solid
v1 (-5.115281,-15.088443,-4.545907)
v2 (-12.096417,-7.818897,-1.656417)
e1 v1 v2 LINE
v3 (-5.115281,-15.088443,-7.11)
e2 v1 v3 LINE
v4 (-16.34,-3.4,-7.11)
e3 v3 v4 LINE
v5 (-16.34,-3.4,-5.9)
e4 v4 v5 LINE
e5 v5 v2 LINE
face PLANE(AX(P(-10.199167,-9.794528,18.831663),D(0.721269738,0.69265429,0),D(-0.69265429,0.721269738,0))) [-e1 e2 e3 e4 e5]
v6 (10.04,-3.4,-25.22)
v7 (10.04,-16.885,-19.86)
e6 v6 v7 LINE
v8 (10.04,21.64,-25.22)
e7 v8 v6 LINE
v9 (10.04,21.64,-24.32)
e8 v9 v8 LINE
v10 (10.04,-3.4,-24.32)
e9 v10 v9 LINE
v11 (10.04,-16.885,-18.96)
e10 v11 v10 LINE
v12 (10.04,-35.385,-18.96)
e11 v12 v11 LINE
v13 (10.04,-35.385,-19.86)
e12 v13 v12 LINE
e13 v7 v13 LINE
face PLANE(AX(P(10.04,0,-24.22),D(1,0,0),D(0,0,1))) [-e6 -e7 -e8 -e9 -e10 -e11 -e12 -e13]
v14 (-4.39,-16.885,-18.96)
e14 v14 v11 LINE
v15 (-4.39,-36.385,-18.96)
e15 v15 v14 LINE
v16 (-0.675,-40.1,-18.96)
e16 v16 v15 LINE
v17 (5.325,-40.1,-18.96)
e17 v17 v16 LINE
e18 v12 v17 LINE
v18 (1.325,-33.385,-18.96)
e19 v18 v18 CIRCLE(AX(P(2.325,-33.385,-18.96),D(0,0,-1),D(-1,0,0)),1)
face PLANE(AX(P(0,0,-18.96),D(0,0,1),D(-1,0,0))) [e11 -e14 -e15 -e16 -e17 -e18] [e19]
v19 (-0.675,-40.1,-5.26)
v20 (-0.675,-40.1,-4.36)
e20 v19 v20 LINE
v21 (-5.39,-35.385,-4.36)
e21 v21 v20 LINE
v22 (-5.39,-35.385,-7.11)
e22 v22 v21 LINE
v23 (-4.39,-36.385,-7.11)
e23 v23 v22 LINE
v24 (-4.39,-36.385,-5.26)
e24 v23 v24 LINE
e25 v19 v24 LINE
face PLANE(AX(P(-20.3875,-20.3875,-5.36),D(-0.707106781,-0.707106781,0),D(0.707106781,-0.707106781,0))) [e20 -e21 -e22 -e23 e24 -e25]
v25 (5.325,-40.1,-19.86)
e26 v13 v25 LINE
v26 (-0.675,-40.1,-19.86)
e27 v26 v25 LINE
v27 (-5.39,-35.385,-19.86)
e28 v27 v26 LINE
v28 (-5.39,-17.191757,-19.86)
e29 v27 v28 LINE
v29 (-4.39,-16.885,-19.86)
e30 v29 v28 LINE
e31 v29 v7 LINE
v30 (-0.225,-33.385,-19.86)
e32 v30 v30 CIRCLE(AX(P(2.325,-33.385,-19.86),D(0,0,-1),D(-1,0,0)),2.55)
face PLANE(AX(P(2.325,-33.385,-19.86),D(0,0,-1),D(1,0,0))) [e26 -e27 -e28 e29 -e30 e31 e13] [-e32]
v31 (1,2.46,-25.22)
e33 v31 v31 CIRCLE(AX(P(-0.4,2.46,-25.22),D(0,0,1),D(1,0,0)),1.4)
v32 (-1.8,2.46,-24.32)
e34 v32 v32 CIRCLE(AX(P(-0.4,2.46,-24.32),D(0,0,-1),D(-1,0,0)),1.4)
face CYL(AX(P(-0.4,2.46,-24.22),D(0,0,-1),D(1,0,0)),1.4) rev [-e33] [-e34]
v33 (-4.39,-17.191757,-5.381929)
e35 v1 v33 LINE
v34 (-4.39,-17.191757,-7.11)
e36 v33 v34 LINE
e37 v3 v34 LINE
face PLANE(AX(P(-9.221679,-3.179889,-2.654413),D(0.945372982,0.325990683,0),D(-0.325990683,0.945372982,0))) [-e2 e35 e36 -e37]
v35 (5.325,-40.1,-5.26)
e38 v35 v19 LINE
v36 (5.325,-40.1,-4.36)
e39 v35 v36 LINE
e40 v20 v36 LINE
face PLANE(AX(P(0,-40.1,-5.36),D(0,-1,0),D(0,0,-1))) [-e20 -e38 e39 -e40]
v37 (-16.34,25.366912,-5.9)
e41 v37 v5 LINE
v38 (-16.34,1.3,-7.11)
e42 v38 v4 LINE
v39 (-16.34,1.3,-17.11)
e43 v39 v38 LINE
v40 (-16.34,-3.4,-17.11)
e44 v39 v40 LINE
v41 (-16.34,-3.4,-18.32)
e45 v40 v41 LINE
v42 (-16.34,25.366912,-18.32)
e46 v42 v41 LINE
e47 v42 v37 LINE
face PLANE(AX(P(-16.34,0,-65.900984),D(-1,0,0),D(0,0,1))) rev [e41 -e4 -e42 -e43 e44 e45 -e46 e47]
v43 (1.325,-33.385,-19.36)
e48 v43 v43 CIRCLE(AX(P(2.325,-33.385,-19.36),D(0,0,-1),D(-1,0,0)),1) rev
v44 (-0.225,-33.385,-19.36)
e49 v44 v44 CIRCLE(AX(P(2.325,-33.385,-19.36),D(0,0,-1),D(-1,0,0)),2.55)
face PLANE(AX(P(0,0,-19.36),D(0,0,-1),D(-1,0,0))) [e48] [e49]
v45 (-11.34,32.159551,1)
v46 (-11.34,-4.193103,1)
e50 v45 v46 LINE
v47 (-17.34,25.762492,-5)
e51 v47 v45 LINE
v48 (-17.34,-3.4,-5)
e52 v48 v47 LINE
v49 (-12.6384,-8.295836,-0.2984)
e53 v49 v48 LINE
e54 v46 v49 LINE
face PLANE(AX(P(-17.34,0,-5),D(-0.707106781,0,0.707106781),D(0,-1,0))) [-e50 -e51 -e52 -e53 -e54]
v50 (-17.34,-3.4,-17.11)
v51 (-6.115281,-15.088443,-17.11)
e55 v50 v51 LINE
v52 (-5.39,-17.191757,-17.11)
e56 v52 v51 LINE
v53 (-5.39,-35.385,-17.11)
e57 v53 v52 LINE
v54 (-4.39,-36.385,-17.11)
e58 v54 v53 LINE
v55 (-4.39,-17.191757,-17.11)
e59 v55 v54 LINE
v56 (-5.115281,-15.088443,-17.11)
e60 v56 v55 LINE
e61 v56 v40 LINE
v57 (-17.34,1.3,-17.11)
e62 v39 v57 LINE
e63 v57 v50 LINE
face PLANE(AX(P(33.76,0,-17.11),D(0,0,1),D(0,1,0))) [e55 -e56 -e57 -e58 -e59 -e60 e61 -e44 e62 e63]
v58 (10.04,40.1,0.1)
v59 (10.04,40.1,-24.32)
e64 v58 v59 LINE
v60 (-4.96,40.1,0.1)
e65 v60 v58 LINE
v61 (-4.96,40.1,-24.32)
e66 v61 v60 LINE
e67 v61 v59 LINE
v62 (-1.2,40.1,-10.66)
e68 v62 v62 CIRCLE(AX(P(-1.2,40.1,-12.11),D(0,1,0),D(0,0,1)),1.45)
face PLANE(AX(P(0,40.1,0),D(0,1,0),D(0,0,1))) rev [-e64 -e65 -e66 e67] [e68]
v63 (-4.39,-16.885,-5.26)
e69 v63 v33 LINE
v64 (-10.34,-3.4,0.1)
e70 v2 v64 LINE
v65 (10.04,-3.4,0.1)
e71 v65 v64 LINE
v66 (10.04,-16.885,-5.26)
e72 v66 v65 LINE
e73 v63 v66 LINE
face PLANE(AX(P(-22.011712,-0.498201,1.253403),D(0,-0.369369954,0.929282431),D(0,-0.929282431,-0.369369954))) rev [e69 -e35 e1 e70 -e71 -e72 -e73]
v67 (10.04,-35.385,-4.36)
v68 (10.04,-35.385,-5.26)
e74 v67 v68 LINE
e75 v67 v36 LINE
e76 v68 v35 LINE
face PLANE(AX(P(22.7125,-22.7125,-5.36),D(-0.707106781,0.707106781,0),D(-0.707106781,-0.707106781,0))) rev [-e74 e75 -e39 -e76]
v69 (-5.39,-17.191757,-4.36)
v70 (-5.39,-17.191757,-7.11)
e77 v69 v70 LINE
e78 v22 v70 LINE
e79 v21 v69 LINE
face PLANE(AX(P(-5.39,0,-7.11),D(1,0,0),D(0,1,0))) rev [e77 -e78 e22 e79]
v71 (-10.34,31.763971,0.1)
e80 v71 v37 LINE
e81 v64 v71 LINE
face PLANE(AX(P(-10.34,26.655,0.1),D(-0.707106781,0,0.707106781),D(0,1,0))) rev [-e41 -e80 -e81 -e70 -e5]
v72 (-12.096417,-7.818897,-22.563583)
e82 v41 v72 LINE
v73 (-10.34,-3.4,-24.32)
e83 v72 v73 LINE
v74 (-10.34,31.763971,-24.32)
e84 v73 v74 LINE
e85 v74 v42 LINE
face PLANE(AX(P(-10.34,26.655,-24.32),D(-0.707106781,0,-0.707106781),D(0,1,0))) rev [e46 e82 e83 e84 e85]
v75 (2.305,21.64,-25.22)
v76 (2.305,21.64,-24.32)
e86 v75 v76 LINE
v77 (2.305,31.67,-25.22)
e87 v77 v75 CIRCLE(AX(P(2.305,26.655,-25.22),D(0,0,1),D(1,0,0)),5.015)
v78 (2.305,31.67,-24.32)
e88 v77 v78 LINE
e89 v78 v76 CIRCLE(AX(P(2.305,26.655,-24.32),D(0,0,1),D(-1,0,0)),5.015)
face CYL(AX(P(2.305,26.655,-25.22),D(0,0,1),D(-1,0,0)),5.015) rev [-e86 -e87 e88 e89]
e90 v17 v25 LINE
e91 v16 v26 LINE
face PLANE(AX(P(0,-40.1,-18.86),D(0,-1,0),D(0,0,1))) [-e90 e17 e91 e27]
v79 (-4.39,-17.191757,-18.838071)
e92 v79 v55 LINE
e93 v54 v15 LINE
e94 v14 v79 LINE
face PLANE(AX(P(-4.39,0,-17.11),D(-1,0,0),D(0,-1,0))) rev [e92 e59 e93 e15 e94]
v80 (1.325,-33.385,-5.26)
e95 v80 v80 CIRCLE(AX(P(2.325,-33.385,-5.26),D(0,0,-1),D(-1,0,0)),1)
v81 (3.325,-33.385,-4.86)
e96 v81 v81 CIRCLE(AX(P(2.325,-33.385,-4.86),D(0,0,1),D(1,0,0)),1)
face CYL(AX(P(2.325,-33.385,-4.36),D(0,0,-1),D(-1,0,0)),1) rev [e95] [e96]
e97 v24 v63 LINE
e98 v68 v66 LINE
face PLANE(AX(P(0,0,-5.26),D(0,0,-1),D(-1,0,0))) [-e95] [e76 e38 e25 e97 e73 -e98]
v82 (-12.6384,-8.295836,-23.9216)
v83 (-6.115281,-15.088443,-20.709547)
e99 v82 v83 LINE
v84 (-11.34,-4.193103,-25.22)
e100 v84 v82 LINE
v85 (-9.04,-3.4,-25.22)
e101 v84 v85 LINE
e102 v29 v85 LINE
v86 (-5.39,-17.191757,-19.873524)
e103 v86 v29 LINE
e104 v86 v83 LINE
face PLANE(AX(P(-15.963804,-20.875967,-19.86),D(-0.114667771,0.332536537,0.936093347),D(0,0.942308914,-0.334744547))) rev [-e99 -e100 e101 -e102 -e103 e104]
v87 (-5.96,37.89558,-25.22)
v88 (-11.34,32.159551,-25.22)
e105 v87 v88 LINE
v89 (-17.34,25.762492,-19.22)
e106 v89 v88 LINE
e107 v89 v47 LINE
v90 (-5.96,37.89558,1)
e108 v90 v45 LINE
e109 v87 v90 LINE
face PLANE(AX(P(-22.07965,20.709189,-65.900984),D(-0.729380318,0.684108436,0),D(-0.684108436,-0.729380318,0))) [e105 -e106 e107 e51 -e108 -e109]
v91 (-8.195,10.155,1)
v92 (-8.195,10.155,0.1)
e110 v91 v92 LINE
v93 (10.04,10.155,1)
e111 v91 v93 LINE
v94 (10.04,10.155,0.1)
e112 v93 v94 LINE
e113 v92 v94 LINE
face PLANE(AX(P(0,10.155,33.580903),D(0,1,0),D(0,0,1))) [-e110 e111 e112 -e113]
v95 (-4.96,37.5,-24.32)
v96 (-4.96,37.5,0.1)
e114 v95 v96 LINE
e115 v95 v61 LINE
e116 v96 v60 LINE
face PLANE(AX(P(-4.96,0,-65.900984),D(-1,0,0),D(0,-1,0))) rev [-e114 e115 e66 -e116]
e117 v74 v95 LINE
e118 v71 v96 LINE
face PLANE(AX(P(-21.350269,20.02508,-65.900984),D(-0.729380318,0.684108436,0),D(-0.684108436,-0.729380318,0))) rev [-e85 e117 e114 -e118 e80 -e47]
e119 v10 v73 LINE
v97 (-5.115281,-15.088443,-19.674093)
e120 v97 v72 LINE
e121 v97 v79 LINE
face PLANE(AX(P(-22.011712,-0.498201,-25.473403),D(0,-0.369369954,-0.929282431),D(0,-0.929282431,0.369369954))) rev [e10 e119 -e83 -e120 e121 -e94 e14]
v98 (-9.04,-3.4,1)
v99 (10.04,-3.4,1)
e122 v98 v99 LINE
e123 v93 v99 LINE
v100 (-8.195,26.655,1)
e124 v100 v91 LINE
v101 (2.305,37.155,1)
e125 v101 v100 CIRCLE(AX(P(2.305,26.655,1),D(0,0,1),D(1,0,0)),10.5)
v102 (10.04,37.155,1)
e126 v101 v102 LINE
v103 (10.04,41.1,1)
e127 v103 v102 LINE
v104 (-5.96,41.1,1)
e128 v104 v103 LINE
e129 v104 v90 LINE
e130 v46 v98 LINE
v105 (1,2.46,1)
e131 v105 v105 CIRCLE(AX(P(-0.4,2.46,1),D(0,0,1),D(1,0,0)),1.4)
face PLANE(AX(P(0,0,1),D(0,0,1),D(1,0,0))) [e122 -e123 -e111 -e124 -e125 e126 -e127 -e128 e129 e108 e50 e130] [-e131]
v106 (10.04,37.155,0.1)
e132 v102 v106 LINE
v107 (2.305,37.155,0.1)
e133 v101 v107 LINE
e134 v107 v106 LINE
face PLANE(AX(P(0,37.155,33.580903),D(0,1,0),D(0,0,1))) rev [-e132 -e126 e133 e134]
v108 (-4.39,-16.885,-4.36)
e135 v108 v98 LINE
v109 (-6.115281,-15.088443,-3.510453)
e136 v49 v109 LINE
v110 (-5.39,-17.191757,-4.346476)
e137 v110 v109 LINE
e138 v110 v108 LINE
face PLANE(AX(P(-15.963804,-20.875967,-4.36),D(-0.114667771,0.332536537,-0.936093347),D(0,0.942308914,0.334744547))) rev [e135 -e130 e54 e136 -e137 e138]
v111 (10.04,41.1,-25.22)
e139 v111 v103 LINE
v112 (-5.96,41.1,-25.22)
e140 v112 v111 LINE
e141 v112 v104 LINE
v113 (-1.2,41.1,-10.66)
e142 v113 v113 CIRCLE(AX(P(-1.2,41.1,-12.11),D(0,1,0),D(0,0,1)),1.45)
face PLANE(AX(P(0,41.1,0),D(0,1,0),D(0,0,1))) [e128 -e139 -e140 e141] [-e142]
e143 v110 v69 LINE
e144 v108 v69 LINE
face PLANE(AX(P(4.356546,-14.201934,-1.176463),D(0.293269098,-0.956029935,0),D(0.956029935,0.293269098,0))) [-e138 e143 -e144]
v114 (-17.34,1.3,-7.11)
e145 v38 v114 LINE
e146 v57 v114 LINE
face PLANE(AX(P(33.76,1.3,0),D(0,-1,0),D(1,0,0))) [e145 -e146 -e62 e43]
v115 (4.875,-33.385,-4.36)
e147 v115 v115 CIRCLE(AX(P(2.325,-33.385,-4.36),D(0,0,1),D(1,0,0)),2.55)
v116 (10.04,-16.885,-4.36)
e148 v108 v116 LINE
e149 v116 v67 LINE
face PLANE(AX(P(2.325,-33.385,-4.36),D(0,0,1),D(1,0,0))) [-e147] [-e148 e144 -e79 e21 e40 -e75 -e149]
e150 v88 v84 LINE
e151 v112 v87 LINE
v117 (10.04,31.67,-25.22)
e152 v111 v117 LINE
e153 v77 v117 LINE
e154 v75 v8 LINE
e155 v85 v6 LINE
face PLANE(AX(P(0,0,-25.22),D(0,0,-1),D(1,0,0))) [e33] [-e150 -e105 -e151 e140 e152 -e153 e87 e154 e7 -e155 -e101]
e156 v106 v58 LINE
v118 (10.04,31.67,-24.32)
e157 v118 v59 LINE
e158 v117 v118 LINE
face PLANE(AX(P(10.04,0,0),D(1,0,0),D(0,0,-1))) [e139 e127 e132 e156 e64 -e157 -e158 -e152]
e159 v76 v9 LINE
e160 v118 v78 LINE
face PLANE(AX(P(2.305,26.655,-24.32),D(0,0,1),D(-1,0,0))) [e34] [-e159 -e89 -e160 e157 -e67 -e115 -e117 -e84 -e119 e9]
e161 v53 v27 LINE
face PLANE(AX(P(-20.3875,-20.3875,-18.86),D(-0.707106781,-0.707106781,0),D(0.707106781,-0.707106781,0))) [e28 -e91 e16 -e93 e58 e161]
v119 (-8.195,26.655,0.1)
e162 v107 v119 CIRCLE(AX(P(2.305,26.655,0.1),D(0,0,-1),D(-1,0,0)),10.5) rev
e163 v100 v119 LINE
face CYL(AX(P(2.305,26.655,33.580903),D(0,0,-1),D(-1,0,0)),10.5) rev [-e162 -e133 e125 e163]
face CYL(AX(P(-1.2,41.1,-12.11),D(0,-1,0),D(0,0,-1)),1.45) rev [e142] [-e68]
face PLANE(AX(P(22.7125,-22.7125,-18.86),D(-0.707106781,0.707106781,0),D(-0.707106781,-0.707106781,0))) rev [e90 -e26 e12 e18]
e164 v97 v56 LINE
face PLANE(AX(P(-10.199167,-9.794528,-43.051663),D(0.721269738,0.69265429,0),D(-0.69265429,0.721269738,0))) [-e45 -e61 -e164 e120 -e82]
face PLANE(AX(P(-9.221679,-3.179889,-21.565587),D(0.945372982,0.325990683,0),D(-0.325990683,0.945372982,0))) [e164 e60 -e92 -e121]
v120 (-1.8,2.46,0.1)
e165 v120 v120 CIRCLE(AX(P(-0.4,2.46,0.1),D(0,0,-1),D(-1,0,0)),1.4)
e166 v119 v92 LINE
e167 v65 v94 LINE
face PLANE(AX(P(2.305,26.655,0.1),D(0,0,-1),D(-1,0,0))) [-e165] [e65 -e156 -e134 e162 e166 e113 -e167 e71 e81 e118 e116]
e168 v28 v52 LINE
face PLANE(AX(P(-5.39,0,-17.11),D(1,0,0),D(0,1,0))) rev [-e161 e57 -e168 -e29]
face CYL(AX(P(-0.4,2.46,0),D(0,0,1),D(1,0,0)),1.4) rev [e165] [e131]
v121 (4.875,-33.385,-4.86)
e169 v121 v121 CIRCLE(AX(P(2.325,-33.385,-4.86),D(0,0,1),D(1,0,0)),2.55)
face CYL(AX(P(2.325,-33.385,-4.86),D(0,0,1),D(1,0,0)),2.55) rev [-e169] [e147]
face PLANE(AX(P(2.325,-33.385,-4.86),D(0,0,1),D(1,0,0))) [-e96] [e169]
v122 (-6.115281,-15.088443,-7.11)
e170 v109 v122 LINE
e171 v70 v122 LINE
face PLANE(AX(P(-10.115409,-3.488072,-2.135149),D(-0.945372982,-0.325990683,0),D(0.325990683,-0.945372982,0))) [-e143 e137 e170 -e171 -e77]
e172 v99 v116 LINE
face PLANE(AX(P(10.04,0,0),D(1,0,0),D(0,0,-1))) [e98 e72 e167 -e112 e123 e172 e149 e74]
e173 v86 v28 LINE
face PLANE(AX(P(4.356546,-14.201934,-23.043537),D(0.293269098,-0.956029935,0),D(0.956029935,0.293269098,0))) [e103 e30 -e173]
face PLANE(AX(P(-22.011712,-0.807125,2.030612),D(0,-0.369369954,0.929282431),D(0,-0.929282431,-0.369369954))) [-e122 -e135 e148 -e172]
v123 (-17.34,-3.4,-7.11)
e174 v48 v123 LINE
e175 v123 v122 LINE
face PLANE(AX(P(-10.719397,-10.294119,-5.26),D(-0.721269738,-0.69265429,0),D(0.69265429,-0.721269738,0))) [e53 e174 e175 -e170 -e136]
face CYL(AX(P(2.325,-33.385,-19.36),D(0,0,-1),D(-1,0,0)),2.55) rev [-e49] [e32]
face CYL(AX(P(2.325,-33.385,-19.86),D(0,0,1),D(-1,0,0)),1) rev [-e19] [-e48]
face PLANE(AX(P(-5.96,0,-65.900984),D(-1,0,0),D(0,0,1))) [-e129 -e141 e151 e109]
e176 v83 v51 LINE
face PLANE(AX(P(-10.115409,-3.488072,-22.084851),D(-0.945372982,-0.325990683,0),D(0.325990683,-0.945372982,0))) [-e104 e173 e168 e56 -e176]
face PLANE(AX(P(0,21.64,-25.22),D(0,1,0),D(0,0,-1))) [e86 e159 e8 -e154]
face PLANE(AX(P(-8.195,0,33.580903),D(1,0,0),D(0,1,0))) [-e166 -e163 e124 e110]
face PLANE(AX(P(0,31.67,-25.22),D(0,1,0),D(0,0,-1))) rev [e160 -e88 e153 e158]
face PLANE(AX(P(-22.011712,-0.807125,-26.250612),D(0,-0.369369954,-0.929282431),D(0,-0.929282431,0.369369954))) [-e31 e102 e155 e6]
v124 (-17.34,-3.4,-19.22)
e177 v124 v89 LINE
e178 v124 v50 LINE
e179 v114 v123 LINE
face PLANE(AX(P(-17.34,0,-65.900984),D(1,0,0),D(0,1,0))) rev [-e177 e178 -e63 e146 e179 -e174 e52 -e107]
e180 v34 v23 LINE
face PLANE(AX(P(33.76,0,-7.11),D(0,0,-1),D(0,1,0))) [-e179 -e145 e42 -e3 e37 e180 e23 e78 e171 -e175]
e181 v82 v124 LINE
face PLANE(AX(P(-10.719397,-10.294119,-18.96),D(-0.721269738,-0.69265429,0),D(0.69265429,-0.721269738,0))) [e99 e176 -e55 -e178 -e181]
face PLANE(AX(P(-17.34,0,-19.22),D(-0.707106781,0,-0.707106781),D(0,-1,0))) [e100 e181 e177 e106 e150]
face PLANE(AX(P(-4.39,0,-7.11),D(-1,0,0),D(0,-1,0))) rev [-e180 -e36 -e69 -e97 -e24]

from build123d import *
from build123d.topology import SkipClean

# Parameters (mm, degrees)
EXTRUDE_1_DEPTH      = 1
SKETCH_2_W           = 14.000000000000007
SKETCH_2_H           = 24.219999999999995
SKETCH_2_R           = 1.45
SKETCH_2_H_2         = 1
EXTRUDE_2_DEPTH      = 1
SKETCH_3_R           = 1.4
CUT_EXTRUDE_1_DEPTH  = 50.06098246060713
EXTRUDE_3_DEPTH      = 25.22
EXTRUDE_4_DEPTH      = 1
CUT_EXTRUDE_2_DEPTH  = 0.1
EXTRUDE_5_REACH      = 56.514
EXTRUDE_6_DEPTH      = 4.7
EXTRUDE_7_DEPTH      = 6.26
CUT_EXTRUDE_3_DEPTH  = 54.61414092494707
CUT_EXTRUDE_4_REACH  = 50.47
EXTRUDE_8_REACH      = 53.244
CUT_EXTRUDE_6_DEPTH  = 0.721269738
SKETCH_15_R          = 1.000000000000005
EXTRUDE_9_DEPTH      = 1
EXTRUDE_START        = -1
EXTRUDE_10_DEPTH     = 1
CUT_EXTRUDE_7_DEPTH  = 0.1
CUT_EXTRUDE_10_REACH = 56.514
CUT_EXTRUDE_12_DEPTH = 51.10000000000001
EXTRUDE_START_2      = -2.75
EXTRUDE_11_DEPTH     = 2.75
CUT_EXTRUDE_13_REACH = 49.777
CUT_EXTRUDE_14_REACH = 49.777
EXTRUDE_12_DEPTH     = 2.75
EXTRUDE_13_REACH     = 50.829
CUT_EXTRUDE_15_REACH = 49.777
EXTRUDE_START_3      = -2.81831
EXTRUDE_14_DEPTH     = 2.81831
CUT_EXTRUDE_START    = -0.75
CUT_EXTRUDE_16_DEPTH = 0.75
CHAMFER_1_SIZE       = 0.8
CHAMFER_3_SIZE       = 6
EXTRUDE_15_DEPTH     = 1
EXTRUDE_16_DEPTH     = 1
CUT_EXTRUDE_17_DEPTH = 1
SKETCH_36_R          = 1.4000000000000001
CUT_EXTRUDE_18_DEPTH = 1
EXTRUDE_17_DEPTH     = 0.9
CUT_EXTRUDE_START_2  = -12.11
SKETCH_40_W          = 89.84282301383726
SKETCH_40_H          = 107.72029223205328
CUT_EXTRUDE_20_DEPTH = 12.11
CUT_EXTRUDE_22_DEPTH = 13.11
SKETCH_42_R          = 2.549999999999999
SKETCH_42_R_2        = 1.000000000000005
CUT_EXTRUDE_23_DEPTH = 0.5
CUT_EXTRUDE_START_3  = -0.5
SKETCH_43_R          = 2.549999999999998
CUT_EXTRUDE_24_DEPTH = 0.5


with BuildPart() as part:
    # 草图1 → 凸台-拉伸1 (new body)
    with BuildSketch(Plane.XY):
        with BuildLine():
            ThreePointArc((2.305000000000004, 21.64000000000001), (-2.7099999999999955, 26.655000000000012), (2.3050000000000055, 31.670000000000012))
            Line((2.305000000000005, 31.670000000000012), (9.040000000000003, 31.670000000000012))
            Line((9.040000000000003, 31.670000000000012), (9.040000000000003, 40.10000000000001))
            Line((9.040000000000003, 40.10000000000001), (-4.960000000000004, 40.10000000000001))
            Line((-4.960000000000004, 40.10000000000001), (-4.960000000000003, 37.50000000000002))
            Line((-4.960000000000003, 37.50000000000002), (-9.039999999999996, 33.15000000000001))
            Line((-9.039999999999996, 33.15000000000001), (-9.04, -3.3999999999999915))
            Line((-9.04, -3.3999999999999932), (9.040000000000003, -3.3999999999999932))
            Line((9.040000000000003, -3.3999999999999932), (9.040000000000003, 6.670384958363659))
            Line((9.040000000000003, 6.670384958363659), (9.040000000000003, 21.640000000000015))
            Line((9.040000000000003, 21.640000000000015), (2.305000000000005, 21.640000000000015))
        make_face()
    extrude(amount=EXTRUDE_1_DEPTH)

    # 草图2 → 凸台-拉伸2 (add)
    # profile 1 of 2: a face of its own
    with BuildSketch(Plane(origin=(0, 40.10000000000001, 0), x_dir=(1, 0, 0), z_dir=(0, 1, 0))):
        with Locations((2.039999999999999, 12.109999999999998)):
            Rectangle(SKETCH_2_W, SKETCH_2_H)
        with Locations(Location((-1.1999999999999935, 12.11, 0), (0, 0, 270))):
            Circle(SKETCH_2_R, mode=Mode.SUBTRACT)
    # profile 2 of 2: a face of its own
    with BuildSketch(Plane(origin=(0, 40.10000000000001, 0), x_dir=(1, 0, 0), z_dir=(0, 1, 0))):
        with Locations((2.039999999999999, -0.5)):
            Rectangle(SKETCH_2_W, SKETCH_2_H_2)
    extrude(amount=EXTRUDE_2_DEPTH)

    # 草图3 → 切除-拉伸1 (cut, through all)
    with BuildSketch(Plane.XY.offset(1)):
        with Locations((0.9999999999999981, 2.460000000000012)):
            Circle(SKETCH_3_R)
    extrude(amount=-CUT_EXTRUDE_1_DEPTH, mode=Mode.SUBTRACT)

    # 草图4 → 凸台-拉伸3 (add)
    with BuildSketch(Plane.XY.offset(1)):
        Polygon((-15.939999999999996, 25.793382352941165), (-15.939999999999996, 27.255138921743242), (-17.339999999999993, 25.762491862919703), (-17.339999999999996, 24.30073529411763), (-16.33999999999999, 25.366911764705875), align=None)
        Polygon((-16.33999999999999, 25.366911764705875), (-17.339999999999996, 24.30073529411763), (-17.339999999999996, 24.20000000000001), (-17.339999999999993, 1.3000000000000078), (-16.339999999999996, 1.3000000000000096), (-16.339999999999996, 24.20000000000001), align=None)
        Polygon((-4.960000000000004, 41.10000000000001), (-5.960000000000004, 41.10000000000001), (-5.960000000000004, 37.89558009821385), (-9.769380317724162, 33.834108435934404), (-15.93999999999999, 27.25513892174324), (-15.939999999999996, 25.793382352941165), (-9.039999999999996, 33.15000000000001), (-4.960000000000003, 37.50000000000002), align=None)
    extrude(amount=-EXTRUDE_3_DEPTH)

    # 草图5 → 凸台-拉伸4 (add)
    with BuildSketch(Plane.XY.offset(1)):
        Polygon((-16.339999999999993, 25.36691176470587), (-16.339999999999996, 1.3000000000000096), (-9.039999999999997, 1.3000000000000165), (-9.039999999999994, 33.15000000000001), align=None)
    extrude(amount=-EXTRUDE_4_DEPTH)

    # 草图6 → 切除-拉伸2 (cut)
    with BuildSketch(Plane(origin=(0, 0, 0), x_dir=(-1, 0, 0), z_dir=(0, 0, -1))):
        with BuildLine():
            Line((-2.305000000000006, 21.640000000000015), (-9.040000000000003, 21.640000000000015))
            Line((-9.040000000000003, 21.640000000000015), (-9.040000000000003, -3.3999999999999932))
            Line((-9.040000000000003, -3.3999999999999932), (9.04, -3.3999999999999932))
            Line((9.04, -3.3999999999999932), (9.04, 1.300000000000013))
            Line((9.04, 1.300000000000013), (16.339999999999996, 1.3000000000000096))
            Line((16.339999999999996, 1.3000000000000096), (16.339999999999993, 25.36691176470587))
            Line((16.339999999999993, 25.36691176470587), (4.959999999999999, 37.50000000000002))
            Line((4.959999999999999, 37.50000000000002), (4.960000000000004, 40.10000000000001))
            Line((4.960000000000004, 40.10000000000001), (-9.040000000000003, 40.10000000000001))
            Line((-9.040000000000003, 40.10000000000001), (-9.040000000000003, 31.670000000000012))
            Line((-9.040000000000003, 31.670000000000012), (-2.3050000000000046, 31.670000000000012))
            ThreePointArc((-2.3050000000000046, 31.670000000000012), (2.709999999999992, 26.655000000000012), (-2.305000000000006, 21.640000000000015))
        make_face()
    extrude(amount=-CUT_EXTRUDE_2_DEPTH, mode=Mode.SUBTRACT)

    # 凸台-拉伸5: up to this plane
    extrude_5_end = Plane(origin=(-9.127141339001065, -3.147290116896902, 0), z_dir=(0.9453729816262727, 0.3259906833194027, 0))
    # 草图7 → 凸台-拉伸5 (add, up to the surface)
    with BuildSketch(Plane(origin=(9.040000000000003, 0, 0), x_dir=(0, 0, -1), z_dir=(1, 0, 0)), mode=Mode.PRIVATE) as extrude_5_sk1:
        Polygon((-1, -3.3999999999999932), (4.359999999999999, -16.885), (5.26, -16.885), (-0.1, -3.3999999999999932), align=None)
    extrude_5_tool1 = split(extrude(extrude_5_sk1.sketch, amount=-EXTRUDE_5_REACH, mode=Mode.PRIVATE), bisect_by=extrude_5_end, keep=Keep.BOTH, mode=Mode.PRIVATE)
    add(extrude_5_tool1.solids().sort_by_distance((9.04, -10.1425, -2.13))[0])

    # 草图8 → 凸台-拉伸6 (add)
    with BuildSketch(Plane.XZ.offset(-1.300000000000013)):
        Polygon((-16.339999999999996, -24.22), (-16.339999999999996, 0.1), (-9.04, 0.10000000000000286), (-9.04, 1), (-17.339999999999993, 1), (-17.340000000000046, -24.22), align=None)
    extrude(amount=EXTRUDE_6_DEPTH)

    # 草图9 → 凸台-拉伸7 (add)
    with BuildSketch(Plane.XY.offset(1)):
        Polygon((-17.339999999999993, -3.399999999999995), (-4.390000000000023, -16.885), (-9.039999999999997, -3.3999999999999932), align=None)
    extrude(amount=-EXTRUDE_7_DEPTH)

    # 草图10 → 切除-拉伸3 (cut, through all)
    with BuildSketch(Plane(origin=(-9.127141339001064, -3.1472901168968996, 0), x_dir=(0, 0, -1), z_dir=(0.9453729816262728, 0.3259906833194025, 0))):
        Polygon((-1, -14.531523694987438), (4.359999999999999, -14.531523694987433), (-1, -0.2673123603219238), align=None)
    extrude(amount=-CUT_EXTRUDE_3_DEPTH, mode=Mode.SUBTRACT)

    # 切除-拉伸4: up to this face of the body (flat: up to its plane)
    cut_extrude_4_end = Plane(part.part.faces().sort_by_distance((1.105315773, -9.810831482, -2.448168835))[0])
    # 草图11 → 切除-拉伸4 (cut, up to the picked face)
    with BuildSketch(Plane(origin=(0, 0, -5.260000000000001), x_dir=(-1, 0, 0), z_dir=(0, 0, -1)), mode=Mode.PRIVATE) as cut_extrude_4_sk1:
        Polygon((4.390000000000023, -16.885000000000005), (17.340000000000007, -3.399999999999995), (16.339999999999996, -3.399999999999995), (9.039999999999997, -3.3999999999999932), align=None)
    cut_extrude_4_tool1 = split(extrude(cut_extrude_4_sk1.sketch, amount=-CUT_EXTRUDE_4_REACH, mode=Mode.PRIVATE), bisect_by=cut_extrude_4_end, keep=Keep.BOTH, mode=Mode.PRIVATE)
    add(cut_extrude_4_tool1.solids().sort_by(Axis((-10.256667, -7.895, -5.26), (0, 0, 1)))[0], mode=Mode.SUBTRACT)

    # 凸台-拉伸8: up to this face of the body (flat: up to its plane)
    extrude_8_end = Plane(part.part.faces().sort_by_distance((-9.568408076, -8.61169244, -0.786666667))[0])
    # 草图13 → 凸台-拉伸8 (add, up to the picked face)
    with BuildSketch(Plane(origin=(0, 0, -24.22), x_dir=(-1, 0, 0), z_dir=(0, 0, -1)), mode=Mode.PRIVATE) as extrude_8_sk1:
        Polygon((17.340000000000007, -3.399999999999997), (16.339999999999996, -3.399999999999995), (3.390000000000013, -16.885000000000005), (4.390000000000022, -16.885000000000005), align=None)
    extrude_8_tool1 = split(extrude(extrude_8_sk1.sketch, amount=-EXTRUDE_8_REACH, mode=Mode.PRIVATE), bisect_by=extrude_8_end, keep=Keep.BOTH, mode=Mode.PRIVATE)
    add(extrude_8_tool1.solids().sort_by(Axis((-10.365, -10.1425, -24.22), (0, 0, 1)))[0])

    # 草图14 → 切除-拉伸6 (cut)
    with BuildSketch(Plane(origin=(-10.199166727519122, -9.79452792891156, 0), x_dir=(0, 0, -1), z_dir=(0.7212697376131842, 0.6926542901068385, 0))):
        Polygon((-1, 9.558308282567797), (-2.0167175162547317, 9.558308282567797), (-1.8942214299589746, 8.865653992460917), (-1, 8.865653992460917), align=None)
        Polygon((-1, 8.865653992460917), (-1.8942214299589746, 8.865653992460917), (-1, 6.243844479321156), align=None)
    extrude(amount=-CUT_EXTRUDE_6_DEPTH, mode=Mode.SUBTRACT)

    # 草图15 → 凸台-拉伸9 (add)
    with BuildSketch(Plane.XY.offset(-5.36)):
        with BuildLine():
            Line((9.040000000000003, -33.385), (9.040000000000003, -16.885))
            Line((9.040000000000003, -16.885), (-4.390000000000019, -16.885000000000005))
            Line((-4.390000000000019, -16.885000000000005), (-4.390000000000003, -33.385))
            ThreePointArc((-4.390000000000003, -33.385), (2.324999999999993, -40.099999999999994), (9.040000000000003, -33.385))
        make_face()
        with Locations((2.3249999999998776, -33.3850000000001)):
            Circle(SKETCH_15_R, mode=Mode.SUBTRACT)
    extrude(amount=EXTRUDE_9_DEPTH)

    # 草图16 → 凸台-拉伸10 (add)
    with BuildSketch(Plane.XY.offset(-4.359999999999999).offset(EXTRUDE_START)):
        with BuildLine():
            Line((-4.390000000000003, -36.385), (-0.6750000000000043, -40.1))
            Line((-0.6750000000000042, -40.1), (2.32499999999999, -40.1))
            ThreePointArc((2.32499999999999, -40.1), (-2.423222035667676, -38.133222035667664), (-4.390000000000009, -33.385))
            Line((-4.390000000000009, -33.385), (-4.390000000000003, -36.385))
        make_face()
        with BuildLine():
            ThreePointArc((9.04, -33.385), (7.073222035667661, -38.13322203566767), (2.32499999999999, -40.1))
            Line((2.32499999999999, -40.1), (5.324999999999997, -40.1))
            Line((5.324999999999997, -40.1), (9.039999999999996, -36.385))
            Line((9.039999999999996, -36.385), (9.039999999999997, -33.385))
        make_face()
    extrude(amount=EXTRUDE_10_DEPTH)

    # 草图17 → 切除-拉伸7 (cut)
    with BuildSketch(Plane(origin=(0, 0, -5.36), x_dir=(-1, 0, 0), z_dir=(0, 0, -1))):
        Polygon((-5.324999999999997, -40.1), (0.6750000000000042, -40.1), (4.390000000000003, -36.385), (4.390000000000023, -16.885), (3.3900000000000112, -16.885000000000005), (-9.040000000000003, -16.885), (-9.039999999999996, -36.385), align=None)
    extrude(amount=-CUT_EXTRUDE_7_DEPTH, mode=Mode.SUBTRACT)

    # 切除-拉伸10: up to this face of the body (flat: up to its plane)
    cut_extrude_10_end = Plane(part.part.faces().sort_by_distance((-10.132298213, -9.864158965, -13.344682686))[0])
    # 草图18 → 切除-拉伸10 (cut, up to the picked face)
    with BuildSketch(Plane.ZY.offset(17.34000000000005), mode=Mode.PRIVATE) as cut_extrude_10_sk1:
        Polygon((-18.86, -16.885), (-24.22, -3.3999999999999932), (-24.22, -16.885000000000016), align=None)
    cut_extrude_10_tool1 = split(extrude(cut_extrude_10_sk1.sketch, amount=-CUT_EXTRUDE_10_REACH, mode=Mode.PRIVATE), bisect_by=cut_extrude_10_end, keep=Keep.BOTH, mode=Mode.PRIVATE)
    add(cut_extrude_10_tool1.solids().sort_by(Axis((-17.34, -12.39, -22.433333), (1, -2.22e-15, 0)))[0], mode=Mode.SUBTRACT)

    # 草图20 → 切除-拉伸12 (cut)
    with BuildSketch(Plane.ZY.offset(17.34000000000005)):
        Polygon((-7.109999999999996, -3.4000000000000106), (-16.109999999999996, -3.400000000000023), (-16.109999999999992, -16.885000000000012), (-7.109999999999994, -16.885000000000012), align=None)
        Polygon((-7.109999999999994, -16.885000000000012), (-16.109999999999996, -16.885000000000005), (-16.109999999999992, -19.987970333282604), (-7.109999999999992, -19.987970333282604), align=None)
        Polygon((-14.919999999999998, 1.3000000000000096), (-16.109999999999996, 1.3000000000000096), (-16.109999999999996, -3.400000000000033), (-7.109999999999996, -3.4000000000000106), (-7.109999999999997, 1.3000000000000107), align=None)
    extrude(amount=-CUT_EXTRUDE_12_DEPTH, mode=Mode.SUBTRACT)

    # 草图22 → 凸台-拉伸11 (add)
    with BuildSketch(Plane.XY.offset(-4.359999999999999).offset(EXTRUDE_START_2)):
        Polygon((-5.390000000000022, -15.843687258687254), (-5.390000000000019, -16.885000000000005), (-5.3900000000000166, -35.384999999999984), (-4.390000000000003, -36.385), (-4.390000000000019, -16.885000000000005), align=None)
    extrude(amount=EXTRUDE_11_DEPTH)

    # 切除-拉伸13: up to this plane
    cut_extrude_13_end = Plane(origin=(-22.011711829773798, -0.4982010551356256, 1.2534032142731184), z_dir=(0, -0.36936995412553747, 0.9292824312281485))
    # 草图23 → 切除-拉伸13 (cut, up to the surface)
    with BuildSketch(Plane(origin=(0, -1.16e-15, -7.109999999999997), x_dir=(-1, 0, 0), z_dir=(0, -1.6e-16, -1)), mode=Mode.PRIVATE) as cut_extrude_13_sk1:
        Polygon((3.3900000000000112, -16.88499999999999), (4.390000000000031, -16.884999999999987), (4.950240963855443, -15.260301204819266), align=None)
    cut_extrude_13_tool1 = split(extrude(cut_extrude_13_sk1.sketch, amount=-CUT_EXTRUDE_13_REACH, mode=Mode.PRIVATE), bisect_by=cut_extrude_13_end, keep=Keep.BOTH, mode=Mode.PRIVATE)
    add(cut_extrude_13_tool1.solids().sort_by_distance((-4.243414, -16.343434, -7.11))[0], mode=Mode.SUBTRACT)

    # 切除-拉伸14: up to this plane
    cut_extrude_14_end = Plane(origin=(-22.011711829773798, -0.4982010551356256, 1.2534032142731184), z_dir=(0, -0.36936995412553747, 0.9292824312281485))
    # 草图25 → 切除-拉伸14 (cut, up to the surface)
    with BuildSketch(Plane(origin=(0, -1.16e-15, -7.109999999999997), x_dir=(-1, 0, 0), z_dir=(0, -1.6e-16, -1)), mode=Mode.PRIVATE) as cut_extrude_14_sk1:
        Polygon((4.484537298162646, -16.917599068331942), (5.044778262018067, -15.292900273151215), (5.115280688300644, -15.088443236931736), (4.950240963855439, -15.260301204819275), (4.390000000000019, -16.885000000000005), (4.390000000000019, -17.191757233003564), align=None)
    cut_extrude_14_tool1 = split(extrude(cut_extrude_14_sk1.sketch, amount=-CUT_EXTRUDE_14_REACH, mode=Mode.PRIVATE), bisect_by=cut_extrude_14_end, keep=Keep.BOTH, mode=Mode.PRIVATE)
    add(cut_extrude_14_tool1.solids().sort_by_distance((-4.713146, -16.107819, -7.11))[0], mode=Mode.SUBTRACT)

    # 草图26 → 凸台-拉伸12 (add)
    with BuildSketch(Plane(origin=(0, -1.16e-15, -7.109999999999997), x_dir=(-1, 0, 0), z_dir=(0, -1.6e-16, -1))):
        Polygon((5.390000000000022, -15.843687258687257), (5.390000000000022, -17.191757233003564), (6.115280688300655, -15.088443236931735), align=None)
    extrude(amount=-EXTRUDE_12_DEPTH)

    # 凸台-拉伸13: up to this face of the body (flat: up to its plane)
    extrude_13_end = Plane(part.part.faces().sort_by_distance((-9.568408076, -8.61169244, -0.786666667))[0])
    # 草图27 → 凸台-拉伸13 (add, up to the picked face)
    with BuildSketch(Plane.XY.offset(-4.359999999999999), mode=Mode.PRIVATE) as extrude_13_sk1:
        Polygon((-4.390000000000019, -16.885000000000005), (-5.390000000000021, -17.19175723300357), (-6.115280688300651, -15.088443236931742), align=None)
    extrude_13_tool1 = split(extrude(extrude_13_sk1.sketch, amount=EXTRUDE_13_REACH, mode=Mode.PRIVATE), bisect_by=extrude_13_end, keep=Keep.BOTH, mode=Mode.PRIVATE)
    add(extrude_13_tool1.solids().sort_by(Axis((-5.298427, -16.3884, -4.36), (0, 0, 1)))[0])

    # 切除-拉伸15: up to this plane
    cut_extrude_15_end = Plane(origin=(7.450077950019115, -8.77736715203255, -22.08261120245499), z_dir=(0, -0.36936995412553747, -0.9292824312281485))
    # 草图28 → 切除-拉伸15 (cut, up to the surface)
    with BuildSketch(Plane.XY.offset(-16.109999999999996), mode=Mode.PRIVATE) as cut_extrude_15_sk1:
        Polygon((-5.115280688300643, -15.088443236931733), (-4.555039724445227, -16.71314203211245), (-4.390000000000022, -16.884999999999998), (-3.3900000000000103, -16.885000000000005), align=None)
    cut_extrude_15_tool1 = split(extrude(cut_extrude_15_sk1.sketch, amount=-CUT_EXTRUDE_15_REACH, mode=Mode.PRIVATE), bisect_by=cut_extrude_15_end, keep=Keep.BOTH, mode=Mode.PRIVATE)
    add(cut_extrude_15_tool1.solids().sort_by_distance((-4.332333, -16.281146, -16.11))[0], mode=Mode.SUBTRACT)

    # 草图29 → 凸台-拉伸14 (add)
    with BuildSketch(Plane.XY.offset(-16.109999999999996).offset(EXTRUDE_START_3)):
        Polygon((-4.390000000000019, -17.19175723300356), (-4.555039724445218, -16.71314203211248), (-6.115280688300654, -15.088443236931742), (-5.390000000000018, -17.191757233003575), (-5.3900000000000166, -35.384999999999984), (-4.389999999999998, -36.38500000000001), align=None)
    extrude(amount=EXTRUDE_14_DEPTH)

    # 草图30 → 切除-拉伸16 (cut)
    with BuildSketch(Plane.XY.offset(-16.109999999999996).offset(CUT_EXTRUDE_START)):
        Polygon((-6.115280688300638, -15.088443236931745), (-5.1152806883006665, -15.088443236931706), (-4.390000000000019, -17.191757233003564), (-4.389999999999998, -36.38500000000001), (-5.3900000000000166, -35.384999999999984), (-5.390000000000017, -17.191757233003575), align=None)
    extrude(amount=CUT_EXTRUDE_16_DEPTH, mode=Mode.SUBTRACT)

    # 倒角1
    # the kernel refuses this chamfer: 0.8 mm, written as the material it takes off along each edge
    with BuildSketch(Plane(origin=(-8.17262707867337, -15.088443236931827, -16.109999999999992), x_dir=(-3.906507503623607e-14, 0.9996219169112966, 0.027495876610587302), z_dir=(1, 3.908e-14, 0))) as chamfer_1_piece_1_section:
        Polygon((CHAMFER_1_SIZE * 0.999621916911, -CHAMFER_1_SIZE * 0.0274958766106), (-CHAMFER_1_SIZE * 0.0274958766106, -CHAMFER_1_SIZE * 0.999621916911), (0, 0), align=None)
    chamfer_1_piece_1 = extrude(amount=5.114692780745436, mode=Mode.PRIVATE)
    chamfer_1_piece_1 = split(chamfer_1_piece_1, bisect_by=Plane(origin=(-5.615280688300567, -14.821822785366846, -16.859999999999996), z_dir=(0, 0, 1)), keep=Keep.TOP, mode=Mode.PRIVATE)
    add(chamfer_1_piece_1, mode=Mode.SUBTRACT)

    # 倒角3
    chamfer_3_edges = [part.edges().sort_by_distance(p)[0] for p in [
        (-17.339999999999993, 11.181245931459856, 1),
        (-16.339999999999996, 10.983455882352938, 0.1),
    ]]
    chamfer(chamfer_3_edges, length=CHAMFER_3_SIZE)

    # 草图32 → 凸台-拉伸15 (add)
    with BuildSketch(Plane(origin=(0, 0, -24.22), x_dir=(-1, 0, 0), z_dir=(0, 0, -1))):
        Polygon((10.539999999999964, -3.3999999999999932), (16.339999999999996, -3.399999999999995), (16.339999999999996, 25.36691176470587), (10.53999999999996, 31.550735294117693), align=None)
    extrude(amount=-EXTRUDE_15_DEPTH)

    # 草图33 → 凸台-拉伸16 (add)
    with BuildSketch(Plane(origin=(9.040000000000003, 0, 0), x_dir=(0, 0, -1), z_dir=(1, 0, 0))):
        Polygon((5.26, -36.385), (5.26, -16.885), (-0.1, -3.3999999999999932), (-0.1, 21.640000000000015), (-1, 21.640000000000015), (-1, -3.3999999999999932), (4.359999999999999, -16.885), (4.359999999999999, -36.385), align=None)
        Polygon((-0.1, 31.670000000000012), (-0.1, 40.10000000000001), (24.22, 40.10000000000001), (24.22, 41.10000000000001), (-1, 41.10000000000001), (-1, 31.670000000000012), align=None)
    extrude(amount=EXTRUDE_16_DEPTH)

    # 草图34 → 切除-拉伸17 (cut)
    with BuildSketch(Plane.XY.offset(-4.359999999999999)):
        Polygon((10.040000000000004, -35.384999999999984), (9.040000000000003, -36.385), (10.040000000000004, -36.385), align=None)
    extrude(amount=-CUT_EXTRUDE_17_DEPTH, mode=Mode.SUBTRACT)

    # 草图36 → 切除-拉伸18 (cut)
    with BuildSketch(Plane.XY.offset(1)):
        with Locations((-0.4000000000000017, 2.460000000000012)):
            Circle(SKETCH_36_R)
    extrude(amount=-CUT_EXTRUDE_18_DEPTH, mode=Mode.SUBTRACT)

    # 草图37 → 凸台-拉伸17 (add)
    with SkipClean():  # the faces are left unmerged after this step: merging them gives an invalid solid
        with BuildSketch(Plane.XY.offset(1)):
            with BuildLine():
                ThreePointArc((0.9999999999999982, 2.4600000000000115), (0.8124355652982125, 1.7600000000000122), (0.29999999999999805, 1.2475644347017973))
                ThreePointArc((0.2999999999999984, 1.2475644347017978), (1.6999999999999982, 1.247564434701798), (2.3999999999999986, 2.460000000000012))
                ThreePointArc((2.3999999999999986, 2.460000000000012), (1.6999999999999988, 3.672435565298226), (0.29999999999999905, 3.6724355652982275))
                ThreePointArc((0.29999999999999805, 3.6724355652982266), (0.8124355652982123, 3.160000000000012), (0.9999999999999982, 2.460000000000012))
            make_face()
        extrude(amount=-EXTRUDE_17_DEPTH)

    # 草图40 → 切除-拉伸20 (cut)
    with SkipClean():  # the faces are left unmerged after this step: merging them gives an invalid solid
        with BuildSketch(Plane(origin=(0, 0, -24.22), x_dir=(-1, 0, 0), z_dir=(0, 0, -1)).offset(CUT_EXTRUDE_START_2)):
            with Locations((0.15490000207892152, -1.4990762577480474)):
                Rectangle(SKETCH_40_W, SKETCH_40_H)
        extrude(amount=CUT_EXTRUDE_20_DEPTH, mode=Mode.SUBTRACT)

    # 镜向1: part across plane


with BuildPart() as part_1:
    with SkipClean():  # the faces are left unmerged after this step: merging them gives an invalid solid
        add(part.part)
        add(part.part.mirror(Plane.XY.offset(-12.11)))

    # 草图41 → 切除-拉伸22 (cut)
    with SkipClean():  # the faces are left unmerged after this step: merging them gives an invalid solid
        with BuildSketch(Plane.XY.offset(-12.11)):
            with BuildLine():
                Line((10.040000000000004, 37.155000000000015), (2.305000000000005, 37.155000000000015))
                ThreePointArc((2.3050000000000055, 37.155000000000015), (6.529498334560102, 36.26767984597943), (10.039999999999905, 33.7556883469141))
                Line((10.040000000000004, 33.755688346914134), (10.040000000000004, 37.155000000000015))
            make_face()
            with BuildLine():
                ThreePointArc((10.039999999999905, 33.7556883469141), (6.529498334560102, 36.26767984597943), (2.3050000000000055, 37.155000000000015))
                Line((2.305000000000005, 37.155000000000015), (2.3050000000000055, 31.670000000000016))
                Line((2.3050000000000055, 31.670000000000012), (10.040000000000004, 31.670000000000012))
                Line((10.040000000000004, 31.670000000000012), (10.040000000000004, 33.755688346914134))
            make_face()
            with BuildLine():
                Line((2.3050000000000055, 31.670000000000016), (2.305000000000005, 37.155000000000015))
                ThreePointArc((2.3050000000000055, 37.155000000000015), (-5.1196212024587435, 34.07962120245876), (-8.194999999999995, 26.655000000000012))
                Line((-8.194999999999995, 26.655000000000012), (-2.7099999999999955, 26.655000000000012))
                ThreePointArc((-2.7099999999999955, 26.65499999999993), (-1.2411405076505608, 30.20114050765052), (2.3050000000000055, 31.670000000000016))
            make_face()
            with BuildLine():
                Line((-2.7099999999999955, 26.655000000000012), (-8.194999999999995, 26.655000000000012))
                ThreePointArc((-8.194999999999995, 26.655000000000012), (-5.11962120245862, 19.23037879754114), (2.3050000000003577, 16.155000000000012))
                Line((2.3050000000000064, 16.155000000000012), (2.305000000000006, 21.640000000000015))
                ThreePointArc((2.305000000000005, 21.640000000000015), (-1.2411405076505009, 23.10885949234945), (-2.7099999999999955, 26.65499999999993))
            make_face()
            with BuildLine():
                Line((2.3050000000000055, 31.670000000000016), (2.305000000000005, 37.155000000000015))
                ThreePointArc((2.3050000000000055, 37.155000000000015), (-5.1196212024587435, 34.07962120245876), (-8.194999999999995, 26.655000000000012))
                Line((-8.194999999999995, 26.655000000000012), (-2.7099999999999955, 26.655000000000012))
                ThreePointArc((-2.7099999999999955, 26.65499999999993), (-1.2411405076505608, 30.20114050765052), (2.3050000000000055, 31.670000000000016))
            make_face()
            with BuildLine():
                Line((-2.7099999999999955, 26.655000000000012), (-8.194999999999995, 26.655000000000012))
                ThreePointArc((-8.194999999999995, 26.655000000000012), (-5.11962120245862, 19.23037879754114), (2.3050000000003577, 16.155000000000012))
                Line((2.3050000000000064, 16.155000000000012), (2.305000000000006, 21.640000000000015))
                ThreePointArc((2.305000000000005, 21.640000000000015), (-1.2411405076505009, 23.10885949234945), (-2.7099999999999955, 26.65499999999993))
            make_face()
            with BuildLine():
                Line((2.305000000000006, 21.640000000000015), (2.3050000000000064, 16.155000000000012))
                ThreePointArc((2.3050000000003577, 16.155000000000012), (6.52949833456033, 17.04232015402069), (10.04000000000001, 19.55431165308604))
                Line((10.040000000000004, 19.55431165308604), (10.040000000000004, 21.640000000000015))
                Line((10.040000000000004, 21.640000000000015), (2.305000000000005, 21.640000000000015))
            make_face()
            with BuildLine():
                ThreePointArc((10.04000000000001, 19.55431165308604), (6.52949833456033, 17.04232015402069), (2.3050000000003577, 16.155000000000012))
                Line((2.3050000000000064, 16.155000000000012), (2.305000000000007, 10.155000000000015))
                Line((2.305000000000007, 10.155000000000015), (10.040000000000006, 10.155000000000015))
                Line((10.040000000000004, 10.155000000000015), (10.040000000000004, 19.55431165308604))
            make_face()
            with BuildLine():
                ThreePointArc((2.3050000000003577, 16.155000000000012), (-5.11962120245862, 19.23037879754114), (-8.194999999999995, 26.655000000000012))
                Line((-8.194999999999995, 26.655000000000012), (-8.194999999999993, 10.155000000000015))
                Line((-8.194999999999993, 10.155000000000015), (2.305000000000007, 10.155000000000015))
                Line((2.305000000000007, 10.155000000000015), (2.3050000000000064, 16.155000000000012))
            make_face()
        extrude(amount=CUT_EXTRUDE_22_DEPTH, mode=Mode.SUBTRACT)

    # 草图42 → 切除-拉伸23 (cut)
    with SkipClean():  # the faces are left unmerged after this step: merging them gives an invalid solid
        with BuildSketch(Plane(origin=(0, 0, -19.86), x_dir=(-1, 0, 0), z_dir=(0, 0, -1))):
            with Locations((-2.3249999999998776, -33.3850000000001)):
                Circle(SKETCH_42_R)
            with Locations((-2.3249999999998776, -33.3850000000001)):
                Circle(SKETCH_42_R_2, mode=Mode.SUBTRACT)
        extrude(amount=-CUT_EXTRUDE_23_DEPTH, mode=Mode.SUBTRACT)

    # 草图43 → 切除-拉伸24 (cut)
    with SkipClean():  # the faces are left unmerged after this step: merging them gives an invalid solid
        with BuildSketch(Plane.XY.offset(-4.359999999999999).offset(CUT_EXTRUDE_START_3)):
            with Locations(Location((2.3249999999998776, -33.3850000000001, 0), (0, 0, 180))):
                Circle(SKETCH_43_R)
        extrude(amount=CUT_EXTRUDE_24_DEPTH, mode=Mode.SUBTRACT)


solid = part_1.part
